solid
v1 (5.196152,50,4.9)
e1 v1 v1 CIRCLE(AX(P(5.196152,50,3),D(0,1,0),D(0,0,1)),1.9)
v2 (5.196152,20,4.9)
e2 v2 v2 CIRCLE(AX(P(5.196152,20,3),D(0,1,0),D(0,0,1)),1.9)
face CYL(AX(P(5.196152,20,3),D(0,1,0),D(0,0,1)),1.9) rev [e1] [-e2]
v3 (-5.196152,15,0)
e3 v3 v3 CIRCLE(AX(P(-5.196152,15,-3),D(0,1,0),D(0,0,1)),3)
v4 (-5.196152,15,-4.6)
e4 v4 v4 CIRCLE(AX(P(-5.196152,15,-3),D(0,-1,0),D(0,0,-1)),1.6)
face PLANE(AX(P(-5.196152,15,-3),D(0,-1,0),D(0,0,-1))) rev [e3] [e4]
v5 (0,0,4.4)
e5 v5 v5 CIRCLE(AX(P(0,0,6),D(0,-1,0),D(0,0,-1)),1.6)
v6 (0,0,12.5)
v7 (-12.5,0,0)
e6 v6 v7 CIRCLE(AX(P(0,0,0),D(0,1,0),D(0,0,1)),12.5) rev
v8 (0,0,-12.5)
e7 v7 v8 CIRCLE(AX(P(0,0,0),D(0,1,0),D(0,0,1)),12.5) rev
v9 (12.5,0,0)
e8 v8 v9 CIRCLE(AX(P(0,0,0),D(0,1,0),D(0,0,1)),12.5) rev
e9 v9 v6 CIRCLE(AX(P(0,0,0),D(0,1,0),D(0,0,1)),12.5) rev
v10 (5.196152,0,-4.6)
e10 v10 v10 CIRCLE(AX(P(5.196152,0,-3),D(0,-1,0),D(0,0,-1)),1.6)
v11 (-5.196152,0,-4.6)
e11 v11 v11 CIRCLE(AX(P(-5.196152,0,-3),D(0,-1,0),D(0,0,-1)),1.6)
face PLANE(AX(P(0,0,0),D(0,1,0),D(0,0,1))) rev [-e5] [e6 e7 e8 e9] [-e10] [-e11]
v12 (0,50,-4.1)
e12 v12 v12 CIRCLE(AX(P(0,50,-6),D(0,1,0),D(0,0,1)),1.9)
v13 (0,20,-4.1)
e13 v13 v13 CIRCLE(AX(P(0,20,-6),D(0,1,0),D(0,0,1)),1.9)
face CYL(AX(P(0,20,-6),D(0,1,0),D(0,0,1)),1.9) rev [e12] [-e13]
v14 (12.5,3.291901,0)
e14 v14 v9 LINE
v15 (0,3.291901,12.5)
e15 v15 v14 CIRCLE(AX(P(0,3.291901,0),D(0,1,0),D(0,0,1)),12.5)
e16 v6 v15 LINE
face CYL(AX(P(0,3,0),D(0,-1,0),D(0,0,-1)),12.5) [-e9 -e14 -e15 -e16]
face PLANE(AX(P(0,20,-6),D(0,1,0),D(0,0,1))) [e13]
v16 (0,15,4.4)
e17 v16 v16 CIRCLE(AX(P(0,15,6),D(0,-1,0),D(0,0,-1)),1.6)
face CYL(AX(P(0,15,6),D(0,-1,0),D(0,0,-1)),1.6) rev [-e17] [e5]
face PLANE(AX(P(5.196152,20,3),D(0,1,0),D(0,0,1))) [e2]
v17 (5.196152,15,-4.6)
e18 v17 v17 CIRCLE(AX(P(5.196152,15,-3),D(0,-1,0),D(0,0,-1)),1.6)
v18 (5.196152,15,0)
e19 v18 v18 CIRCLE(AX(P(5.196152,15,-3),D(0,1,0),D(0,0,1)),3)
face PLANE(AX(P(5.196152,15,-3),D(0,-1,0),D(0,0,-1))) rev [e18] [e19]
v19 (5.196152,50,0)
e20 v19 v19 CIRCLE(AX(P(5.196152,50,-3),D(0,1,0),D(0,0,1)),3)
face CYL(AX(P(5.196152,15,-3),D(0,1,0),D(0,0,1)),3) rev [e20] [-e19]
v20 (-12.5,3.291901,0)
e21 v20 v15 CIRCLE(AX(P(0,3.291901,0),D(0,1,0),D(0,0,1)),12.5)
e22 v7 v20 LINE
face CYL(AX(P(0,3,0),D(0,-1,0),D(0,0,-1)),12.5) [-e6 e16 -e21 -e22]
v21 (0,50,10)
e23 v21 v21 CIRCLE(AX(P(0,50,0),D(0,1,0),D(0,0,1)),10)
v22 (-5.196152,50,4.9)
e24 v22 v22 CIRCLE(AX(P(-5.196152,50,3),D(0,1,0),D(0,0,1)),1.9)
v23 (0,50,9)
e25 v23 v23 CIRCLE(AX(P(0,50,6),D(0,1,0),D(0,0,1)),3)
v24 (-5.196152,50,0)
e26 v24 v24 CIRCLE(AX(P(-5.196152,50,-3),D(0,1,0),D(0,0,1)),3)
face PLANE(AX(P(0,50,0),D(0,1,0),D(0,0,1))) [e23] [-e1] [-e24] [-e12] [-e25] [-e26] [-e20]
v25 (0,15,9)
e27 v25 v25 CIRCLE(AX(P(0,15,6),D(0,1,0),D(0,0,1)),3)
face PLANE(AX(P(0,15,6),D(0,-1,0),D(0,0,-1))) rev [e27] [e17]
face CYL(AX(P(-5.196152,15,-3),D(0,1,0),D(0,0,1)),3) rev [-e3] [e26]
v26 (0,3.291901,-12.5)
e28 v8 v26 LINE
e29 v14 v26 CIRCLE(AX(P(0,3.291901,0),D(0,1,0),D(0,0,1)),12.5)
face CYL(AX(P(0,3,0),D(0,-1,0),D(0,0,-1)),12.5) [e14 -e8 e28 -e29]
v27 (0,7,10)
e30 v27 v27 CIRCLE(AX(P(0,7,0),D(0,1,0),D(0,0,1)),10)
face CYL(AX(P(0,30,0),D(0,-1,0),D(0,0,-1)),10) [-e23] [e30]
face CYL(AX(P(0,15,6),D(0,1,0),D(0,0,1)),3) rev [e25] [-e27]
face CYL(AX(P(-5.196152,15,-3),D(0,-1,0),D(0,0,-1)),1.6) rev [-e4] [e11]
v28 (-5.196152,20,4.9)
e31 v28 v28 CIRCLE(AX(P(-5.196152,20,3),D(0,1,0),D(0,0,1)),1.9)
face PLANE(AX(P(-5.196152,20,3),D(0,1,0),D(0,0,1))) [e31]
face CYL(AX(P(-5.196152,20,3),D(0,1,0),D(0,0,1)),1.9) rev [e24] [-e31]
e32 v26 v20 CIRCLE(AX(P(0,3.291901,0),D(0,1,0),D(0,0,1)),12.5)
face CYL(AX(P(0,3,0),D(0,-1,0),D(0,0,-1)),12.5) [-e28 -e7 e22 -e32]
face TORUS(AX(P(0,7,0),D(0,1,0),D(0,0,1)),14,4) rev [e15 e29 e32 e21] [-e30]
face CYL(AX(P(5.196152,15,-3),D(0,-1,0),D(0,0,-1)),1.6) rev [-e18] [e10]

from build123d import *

# Parameters (mm, degrees)
SKETCH_1_R          = 10
EXTRUDE_1_DEPTH     = 30
SKETCH_2_R          = 1.85
CUT_EXTRUDE_1_DEPTH = 34.166247904
SKETCH_3_R          = 1.85
SKETCH_3_R_2        = 1.6
EXTRUDE_2_DEPTH     = 15
CUT_EXTRUDE_START   = -15
SKETCH_4_R          = 2.5
SKETCH_4_R_2        = 1.85
CUT_EXTRUDE_2_DEPTH = 15
EXTRUDE_START       = -15
SKETCH_5_R          = 1.85
SKETCH_5_R_2        = 1.6
EXTRUDE_3_DEPTH     = 15
SKETCH_6_R          = 2.5
CUT_EXTRUDE_4_DEPTH = 15
SKETCH_8_W          = 25
SKETCH_8_H          = 25
SKETCH_8_R          = 10
EXTRUDE_4_DEPTH     = 3
FILLET_1_R          = 4
FILLET_6_R          = 12.5
FILLET_7_R          = 12.5
FILLET_8_R          = 12.5
FILLET_9_R          = 12.5
EXTRUDE_START_2     = -25
SKETCH_9_R          = 2.5
EXTRUDE_6_DEPTH     = 25
SKETCH_10_R         = 1.9
CUT_EXTRUDE_5_DEPTH = 10
SKETCH_11_R         = 3
CUT_EXTRUDE_6_DEPTH = 15
EXTRUDE_START_3     = 20
SKETCH_13_R         = 10
SKETCH_13_R_2       = 3
SKETCH_13_R_3       = 1.9
EXTRUDE_7_DEPTH     = 20


# Some blends are built 0.0001 mm under size
with BuildPart() as part:
    # 草图1 → 凸台-拉伸1 (new body)
    with BuildSketch(Plane(origin=(0, 0, 0), x_dir=(1, 0, 0), z_dir=(0, 1, 0))):
        with Locations(Location((0, 0, 0), (0, 0, 270))):
            Circle(SKETCH_1_R)
    extrude(amount=EXTRUDE_1_DEPTH)

    # 草图2 → 切除-拉伸1 (cut, through all)
    with BuildSketch(Plane(origin=(0, 30, 0), x_dir=(1, 0, 0), z_dir=(0, 1, 0))):
        with Locations(Location((0, 6, 0), (0, 0, 270))):
            Circle(SKETCH_2_R)
        with Locations(Location((5.196152423, 3, 0), (0, 0, 270))):
            Circle(SKETCH_2_R)
        with Locations(Location((5.196152423, -3, 0), (0, 0, 270))):
            Circle(SKETCH_2_R)
        with Locations(Location((0, -6, 0), (0, 0, 270))):
            Circle(SKETCH_2_R)
        with Locations(Location((-5.196152423, -3, 0), (0, 0, 270))):
            Circle(SKETCH_2_R)
        with Locations(Location((-5.196152423, 3, 0), (0, 0, 270))):
            Circle(SKETCH_2_R)
    extrude(amount=-CUT_EXTRUDE_1_DEPTH, mode=Mode.SUBTRACT)

    # 草图3 → 凸台-拉伸2 (add)
    # profile 1 of 3: a face of its own
    with BuildSketch(Plane(origin=(0, 30, 0), x_dir=(1, 0, 0), z_dir=(0, 1, 0))):
        with Locations(Location((0, 6, 0), (0, 0, 270))):
            Circle(SKETCH_3_R)
        with Locations(Location((0, 6, 0), (0, 0, 270))):
            Circle(SKETCH_3_R_2, mode=Mode.SUBTRACT)
    # profile 2 of 3: a face of its own
    with BuildSketch(Plane(origin=(0, 30, 0), x_dir=(1, 0, 0), z_dir=(0, 1, 0))):
        with Locations(Location((-5.196152423, -3, 0), (0, 0, 270))):
            Circle(SKETCH_3_R)
        with Locations(Location((-5.196152423, -3, 0), (0, 0, 270))):
            Circle(SKETCH_3_R_2, mode=Mode.SUBTRACT)
    # profile 3 of 3: a face of its own
    with BuildSketch(Plane(origin=(0, 30, 0), x_dir=(1, 0, 0), z_dir=(0, 1, 0))):
        with Locations(Location((5.196152423, -3, 0), (0, 0, 270))):
            Circle(SKETCH_3_R)
        with Locations(Location((5.196152423, -3, 0), (0, 0, 270))):
            Circle(SKETCH_3_R_2, mode=Mode.SUBTRACT)
    extrude(amount=-EXTRUDE_2_DEPTH)

    # 草图4 → 切除-拉伸2 (cut)
    # profile 1 of 3: a face of its own
    with BuildSketch(Plane.XZ.offset(CUT_EXTRUDE_START)):
        with Locations(Location((-5.196152423, 3, 0), (0, 0, 270))):
            Circle(SKETCH_4_R)
        with Locations((-5.196152423, 3)):
            Circle(SKETCH_4_R_2, mode=Mode.SUBTRACT)
    # profile 2 of 3: a face of its own
    with BuildSketch(Plane.XZ.offset(CUT_EXTRUDE_START)):
        with Locations(Location((5.196152423, 3, 0), (0, 0, 270))):
            Circle(SKETCH_4_R)
        with Locations((5.196152423, 3)):
            Circle(SKETCH_4_R_2, mode=Mode.SUBTRACT)
    # profile 3 of 3: a face of its own
    with BuildSketch(Plane.XZ.offset(CUT_EXTRUDE_START)):
        with Locations(Location((0, -6, 0), (0, 0, 270))):
            Circle(SKETCH_4_R)
        with Locations((0, -6)):
            Circle(SKETCH_4_R_2, mode=Mode.SUBTRACT)
    extrude(amount=CUT_EXTRUDE_2_DEPTH, mode=Mode.SUBTRACT)

    # 草图5 → 凸台-拉伸3 (add)
    # profile 1 of 3: a face of its own
    with BuildSketch(Plane.XZ.offset(EXTRUDE_START)):
        with Locations(Location((0, 6, 0), (0, 0, 90))):
            Circle(SKETCH_5_R)
        with Locations(Location((0, 6, 0), (0, 0, 270))):
            Circle(SKETCH_5_R_2, mode=Mode.SUBTRACT)
    # profile 2 of 3: a face of its own
    with BuildSketch(Plane.XZ.offset(EXTRUDE_START)):
        with Locations(Location((-5.196152423, -3, 0), (0, 0, 90))):
            Circle(SKETCH_5_R)
        with Locations(Location((-5.196152423, -3, 0), (0, 0, 270))):
            Circle(SKETCH_5_R_2, mode=Mode.SUBTRACT)
    # profile 3 of 3: a face of its own
    with BuildSketch(Plane.XZ.offset(EXTRUDE_START)):
        with Locations(Location((5.196152423, -3, 0), (0, 0, 90))):
            Circle(SKETCH_5_R)
        with Locations(Location((5.196152423, -3, 0), (0, 0, 270))):
            Circle(SKETCH_5_R_2, mode=Mode.SUBTRACT)
    extrude(amount=EXTRUDE_3_DEPTH)

    # 草图6 → 切除-拉伸4 (cut)
    with BuildSketch(Plane(origin=(0, 30, 0), x_dir=(1, 0, 0), z_dir=(0, 1, 0))):
        with Locations(Location((-5.196152423, 3, 0), (0, 0, 270))):
            Circle(SKETCH_6_R)
        with Locations(Location((5.196152423, 3, 0), (0, 0, 270))):
            Circle(SKETCH_6_R)
        with Locations(Location((0, -6, 0), (0, 0, 270))):
            Circle(SKETCH_6_R)
    extrude(amount=-CUT_EXTRUDE_4_DEPTH, mode=Mode.SUBTRACT)

    # 草图8 → 凸台-拉伸4 (add)
    with BuildSketch(Plane.XZ):
        Rectangle(SKETCH_8_W, SKETCH_8_H)
        with Locations(Location((0, 0, 0), (0, 0, 270))):
            Circle(SKETCH_8_R, mode=Mode.SUBTRACT)
    extrude(amount=-EXTRUDE_4_DEPTH)

    # 圆角1
    # the kernel refuses this fillet: 4 mm, written as the material it adds along each edge
    with BuildSketch(Plane(origin=(0, 3, 0), x_dir=(0, 0, 1), z_dir=(-1, 0, 0))) as fillet_1_piece_1_section:
        with BuildLine():
            CenterArc((10 + FILLET_1_R, FILLET_1_R), FILLET_1_R, 180, 90)
            Line((10 + FILLET_1_R, 0), (10, 0))
            Line((10, 0), (10, FILLET_1_R))
        make_face()
    fillet_1_piece_1 = revolve(axis=Axis((0, 3, 0), (0, 1, 0)), mode=Mode.PRIVATE)
    fillet_1_piece_1 = split(fillet_1_piece_1, bisect_by=Plane(origin=(-12.5, 4.125745955, -11.125745955), z_dir=(1, 0, 0)), keep=Keep.TOP, mode=Mode.PRIVATE)
    fillet_1_piece_1 = split(fillet_1_piece_1, bisect_by=Plane(origin=(0, 4.125745955, 12.5), z_dir=(0, 0, -1)), keep=Keep.TOP, mode=Mode.PRIVATE)
    fillet_1_piece_1 = split(fillet_1_piece_1, bisect_by=Plane(origin=(12.5, 4.125745955, -11.125745955), z_dir=(-1, 0, 0)), keep=Keep.TOP, mode=Mode.PRIVATE)
    fillet_1_piece_1 = split(fillet_1_piece_1, bisect_by=Plane(origin=(0, 4.125745955, -12.5), z_dir=(0, 0, 1)), keep=Keep.TOP, mode=Mode.PRIVATE)
    add(fillet_1_piece_1)

    # 圆角6
    fillet_6_edges = [part.edges().sort_by_distance(p)[0] for p in [
        (12.5, 1.5, 12.5),
    ]]
    fillet(fillet_6_edges, radius=FILLET_6_R)

    # 圆角7
    fillet_7_edges = [part.edges().sort_by_distance(p)[0] for p in [
        (-12.5, 1.5, 12.5),
    ]]
    fillet(fillet_7_edges, radius=FILLET_7_R - 0.0001)  # a hair under: the kernel refuses the full size

    # 圆角8
    fillet_8_edges = [part.edges().sort_by_distance(p)[0] for p in [
        (-12.5, 1.5, -12.5),
    ]]
    fillet(fillet_8_edges, radius=FILLET_8_R)

    # 圆角9
    fillet_9_edges = [part.edges().sort_by_distance(p)[0] for p in [
        (12.5, 1.5, -12.5),
    ]]
    fillet(fillet_9_edges, radius=FILLET_9_R - 0.0001)  # a hair under: the kernel refuses the full size

    # 草图9 → 凸台-拉伸6 (add)
    with BuildSketch(Plane.XZ.offset(EXTRUDE_START_2)):
        with Locations((5.196152423, 3)):
            Circle(SKETCH_9_R)
        with Locations((-5.196152423, 3)):
            Circle(SKETCH_9_R)
        with Locations((0, -6)):
            Circle(SKETCH_9_R)
    extrude(amount=EXTRUDE_6_DEPTH)

    # 草图10 → 切除-拉伸5 (cut)
    with BuildSketch(Plane(origin=(0, 30, 0), x_dir=(1, 0, 0), z_dir=(0, 1, 0))):
        with Locations(Location((0, 6, 0), (0, 0, 270))):
            Circle(SKETCH_10_R)
        with Locations(Location((-5.196152423, -3, 0), (0, 0, 270))):
            Circle(SKETCH_10_R)
        with Locations(Location((5.196152423, -3, 0), (0, 0, 270))):
            Circle(SKETCH_10_R)
    extrude(amount=-CUT_EXTRUDE_5_DEPTH, mode=Mode.SUBTRACT)

    # 草图11 → 切除-拉伸6 (cut)
    with BuildSketch(Plane(origin=(0, 30, 0), x_dir=(1, 0, 0), z_dir=(0, 1, 0))):
        with Locations(Location((-5.196152423, 3, 0), (0, 0, 270))):
            Circle(SKETCH_11_R)
        with Locations(Location((5.196152423, 3, 0), (0, 0, 270))):
            Circle(SKETCH_11_R)
        with Locations(Location((0, -6, 0), (0, 0, 270))):
            Circle(SKETCH_11_R)
    extrude(amount=-CUT_EXTRUDE_6_DEPTH, mode=Mode.SUBTRACT)

    # 草图13 → 凸台-拉伸7 (add)
    with BuildSketch(Plane(origin=(0, 30, 0), x_dir=(1, 0, 0), z_dir=(0, 1, 0)).offset(EXTRUDE_START_3)):
        with Locations(Location((0, 0, 0), (0, 0, 270))):
            Circle(SKETCH_13_R)
        with Locations(Location((-5.196152423, 3, 0), (0, 0, 270))):
            Circle(SKETCH_13_R_2, mode=Mode.SUBTRACT)
        with Locations(Location((0, 6, 0), (0, 0, 270))):
            Circle(SKETCH_13_R_3, mode=Mode.SUBTRACT)
        with Locations(Location((5.196152423, 3, 0), (0, 0, 270))):
            Circle(SKETCH_13_R_2, mode=Mode.SUBTRACT)
        with Locations(Location((0, -6, 0), (0, 0, 270))):
            Circle(SKETCH_13_R_2, mode=Mode.SUBTRACT)
        with Locations(Location((5.196152423, -3, 0), (0, 0, 270))):
            Circle(SKETCH_13_R_3, mode=Mode.SUBTRACT)
        with Locations(Location((-5.196152423, -3, 0), (0, 0, 270))):
            Circle(SKETCH_13_R_3, mode=Mode.SUBTRACT)
    extrude(amount=-EXTRUDE_7_DEPTH)


solid = part.part
